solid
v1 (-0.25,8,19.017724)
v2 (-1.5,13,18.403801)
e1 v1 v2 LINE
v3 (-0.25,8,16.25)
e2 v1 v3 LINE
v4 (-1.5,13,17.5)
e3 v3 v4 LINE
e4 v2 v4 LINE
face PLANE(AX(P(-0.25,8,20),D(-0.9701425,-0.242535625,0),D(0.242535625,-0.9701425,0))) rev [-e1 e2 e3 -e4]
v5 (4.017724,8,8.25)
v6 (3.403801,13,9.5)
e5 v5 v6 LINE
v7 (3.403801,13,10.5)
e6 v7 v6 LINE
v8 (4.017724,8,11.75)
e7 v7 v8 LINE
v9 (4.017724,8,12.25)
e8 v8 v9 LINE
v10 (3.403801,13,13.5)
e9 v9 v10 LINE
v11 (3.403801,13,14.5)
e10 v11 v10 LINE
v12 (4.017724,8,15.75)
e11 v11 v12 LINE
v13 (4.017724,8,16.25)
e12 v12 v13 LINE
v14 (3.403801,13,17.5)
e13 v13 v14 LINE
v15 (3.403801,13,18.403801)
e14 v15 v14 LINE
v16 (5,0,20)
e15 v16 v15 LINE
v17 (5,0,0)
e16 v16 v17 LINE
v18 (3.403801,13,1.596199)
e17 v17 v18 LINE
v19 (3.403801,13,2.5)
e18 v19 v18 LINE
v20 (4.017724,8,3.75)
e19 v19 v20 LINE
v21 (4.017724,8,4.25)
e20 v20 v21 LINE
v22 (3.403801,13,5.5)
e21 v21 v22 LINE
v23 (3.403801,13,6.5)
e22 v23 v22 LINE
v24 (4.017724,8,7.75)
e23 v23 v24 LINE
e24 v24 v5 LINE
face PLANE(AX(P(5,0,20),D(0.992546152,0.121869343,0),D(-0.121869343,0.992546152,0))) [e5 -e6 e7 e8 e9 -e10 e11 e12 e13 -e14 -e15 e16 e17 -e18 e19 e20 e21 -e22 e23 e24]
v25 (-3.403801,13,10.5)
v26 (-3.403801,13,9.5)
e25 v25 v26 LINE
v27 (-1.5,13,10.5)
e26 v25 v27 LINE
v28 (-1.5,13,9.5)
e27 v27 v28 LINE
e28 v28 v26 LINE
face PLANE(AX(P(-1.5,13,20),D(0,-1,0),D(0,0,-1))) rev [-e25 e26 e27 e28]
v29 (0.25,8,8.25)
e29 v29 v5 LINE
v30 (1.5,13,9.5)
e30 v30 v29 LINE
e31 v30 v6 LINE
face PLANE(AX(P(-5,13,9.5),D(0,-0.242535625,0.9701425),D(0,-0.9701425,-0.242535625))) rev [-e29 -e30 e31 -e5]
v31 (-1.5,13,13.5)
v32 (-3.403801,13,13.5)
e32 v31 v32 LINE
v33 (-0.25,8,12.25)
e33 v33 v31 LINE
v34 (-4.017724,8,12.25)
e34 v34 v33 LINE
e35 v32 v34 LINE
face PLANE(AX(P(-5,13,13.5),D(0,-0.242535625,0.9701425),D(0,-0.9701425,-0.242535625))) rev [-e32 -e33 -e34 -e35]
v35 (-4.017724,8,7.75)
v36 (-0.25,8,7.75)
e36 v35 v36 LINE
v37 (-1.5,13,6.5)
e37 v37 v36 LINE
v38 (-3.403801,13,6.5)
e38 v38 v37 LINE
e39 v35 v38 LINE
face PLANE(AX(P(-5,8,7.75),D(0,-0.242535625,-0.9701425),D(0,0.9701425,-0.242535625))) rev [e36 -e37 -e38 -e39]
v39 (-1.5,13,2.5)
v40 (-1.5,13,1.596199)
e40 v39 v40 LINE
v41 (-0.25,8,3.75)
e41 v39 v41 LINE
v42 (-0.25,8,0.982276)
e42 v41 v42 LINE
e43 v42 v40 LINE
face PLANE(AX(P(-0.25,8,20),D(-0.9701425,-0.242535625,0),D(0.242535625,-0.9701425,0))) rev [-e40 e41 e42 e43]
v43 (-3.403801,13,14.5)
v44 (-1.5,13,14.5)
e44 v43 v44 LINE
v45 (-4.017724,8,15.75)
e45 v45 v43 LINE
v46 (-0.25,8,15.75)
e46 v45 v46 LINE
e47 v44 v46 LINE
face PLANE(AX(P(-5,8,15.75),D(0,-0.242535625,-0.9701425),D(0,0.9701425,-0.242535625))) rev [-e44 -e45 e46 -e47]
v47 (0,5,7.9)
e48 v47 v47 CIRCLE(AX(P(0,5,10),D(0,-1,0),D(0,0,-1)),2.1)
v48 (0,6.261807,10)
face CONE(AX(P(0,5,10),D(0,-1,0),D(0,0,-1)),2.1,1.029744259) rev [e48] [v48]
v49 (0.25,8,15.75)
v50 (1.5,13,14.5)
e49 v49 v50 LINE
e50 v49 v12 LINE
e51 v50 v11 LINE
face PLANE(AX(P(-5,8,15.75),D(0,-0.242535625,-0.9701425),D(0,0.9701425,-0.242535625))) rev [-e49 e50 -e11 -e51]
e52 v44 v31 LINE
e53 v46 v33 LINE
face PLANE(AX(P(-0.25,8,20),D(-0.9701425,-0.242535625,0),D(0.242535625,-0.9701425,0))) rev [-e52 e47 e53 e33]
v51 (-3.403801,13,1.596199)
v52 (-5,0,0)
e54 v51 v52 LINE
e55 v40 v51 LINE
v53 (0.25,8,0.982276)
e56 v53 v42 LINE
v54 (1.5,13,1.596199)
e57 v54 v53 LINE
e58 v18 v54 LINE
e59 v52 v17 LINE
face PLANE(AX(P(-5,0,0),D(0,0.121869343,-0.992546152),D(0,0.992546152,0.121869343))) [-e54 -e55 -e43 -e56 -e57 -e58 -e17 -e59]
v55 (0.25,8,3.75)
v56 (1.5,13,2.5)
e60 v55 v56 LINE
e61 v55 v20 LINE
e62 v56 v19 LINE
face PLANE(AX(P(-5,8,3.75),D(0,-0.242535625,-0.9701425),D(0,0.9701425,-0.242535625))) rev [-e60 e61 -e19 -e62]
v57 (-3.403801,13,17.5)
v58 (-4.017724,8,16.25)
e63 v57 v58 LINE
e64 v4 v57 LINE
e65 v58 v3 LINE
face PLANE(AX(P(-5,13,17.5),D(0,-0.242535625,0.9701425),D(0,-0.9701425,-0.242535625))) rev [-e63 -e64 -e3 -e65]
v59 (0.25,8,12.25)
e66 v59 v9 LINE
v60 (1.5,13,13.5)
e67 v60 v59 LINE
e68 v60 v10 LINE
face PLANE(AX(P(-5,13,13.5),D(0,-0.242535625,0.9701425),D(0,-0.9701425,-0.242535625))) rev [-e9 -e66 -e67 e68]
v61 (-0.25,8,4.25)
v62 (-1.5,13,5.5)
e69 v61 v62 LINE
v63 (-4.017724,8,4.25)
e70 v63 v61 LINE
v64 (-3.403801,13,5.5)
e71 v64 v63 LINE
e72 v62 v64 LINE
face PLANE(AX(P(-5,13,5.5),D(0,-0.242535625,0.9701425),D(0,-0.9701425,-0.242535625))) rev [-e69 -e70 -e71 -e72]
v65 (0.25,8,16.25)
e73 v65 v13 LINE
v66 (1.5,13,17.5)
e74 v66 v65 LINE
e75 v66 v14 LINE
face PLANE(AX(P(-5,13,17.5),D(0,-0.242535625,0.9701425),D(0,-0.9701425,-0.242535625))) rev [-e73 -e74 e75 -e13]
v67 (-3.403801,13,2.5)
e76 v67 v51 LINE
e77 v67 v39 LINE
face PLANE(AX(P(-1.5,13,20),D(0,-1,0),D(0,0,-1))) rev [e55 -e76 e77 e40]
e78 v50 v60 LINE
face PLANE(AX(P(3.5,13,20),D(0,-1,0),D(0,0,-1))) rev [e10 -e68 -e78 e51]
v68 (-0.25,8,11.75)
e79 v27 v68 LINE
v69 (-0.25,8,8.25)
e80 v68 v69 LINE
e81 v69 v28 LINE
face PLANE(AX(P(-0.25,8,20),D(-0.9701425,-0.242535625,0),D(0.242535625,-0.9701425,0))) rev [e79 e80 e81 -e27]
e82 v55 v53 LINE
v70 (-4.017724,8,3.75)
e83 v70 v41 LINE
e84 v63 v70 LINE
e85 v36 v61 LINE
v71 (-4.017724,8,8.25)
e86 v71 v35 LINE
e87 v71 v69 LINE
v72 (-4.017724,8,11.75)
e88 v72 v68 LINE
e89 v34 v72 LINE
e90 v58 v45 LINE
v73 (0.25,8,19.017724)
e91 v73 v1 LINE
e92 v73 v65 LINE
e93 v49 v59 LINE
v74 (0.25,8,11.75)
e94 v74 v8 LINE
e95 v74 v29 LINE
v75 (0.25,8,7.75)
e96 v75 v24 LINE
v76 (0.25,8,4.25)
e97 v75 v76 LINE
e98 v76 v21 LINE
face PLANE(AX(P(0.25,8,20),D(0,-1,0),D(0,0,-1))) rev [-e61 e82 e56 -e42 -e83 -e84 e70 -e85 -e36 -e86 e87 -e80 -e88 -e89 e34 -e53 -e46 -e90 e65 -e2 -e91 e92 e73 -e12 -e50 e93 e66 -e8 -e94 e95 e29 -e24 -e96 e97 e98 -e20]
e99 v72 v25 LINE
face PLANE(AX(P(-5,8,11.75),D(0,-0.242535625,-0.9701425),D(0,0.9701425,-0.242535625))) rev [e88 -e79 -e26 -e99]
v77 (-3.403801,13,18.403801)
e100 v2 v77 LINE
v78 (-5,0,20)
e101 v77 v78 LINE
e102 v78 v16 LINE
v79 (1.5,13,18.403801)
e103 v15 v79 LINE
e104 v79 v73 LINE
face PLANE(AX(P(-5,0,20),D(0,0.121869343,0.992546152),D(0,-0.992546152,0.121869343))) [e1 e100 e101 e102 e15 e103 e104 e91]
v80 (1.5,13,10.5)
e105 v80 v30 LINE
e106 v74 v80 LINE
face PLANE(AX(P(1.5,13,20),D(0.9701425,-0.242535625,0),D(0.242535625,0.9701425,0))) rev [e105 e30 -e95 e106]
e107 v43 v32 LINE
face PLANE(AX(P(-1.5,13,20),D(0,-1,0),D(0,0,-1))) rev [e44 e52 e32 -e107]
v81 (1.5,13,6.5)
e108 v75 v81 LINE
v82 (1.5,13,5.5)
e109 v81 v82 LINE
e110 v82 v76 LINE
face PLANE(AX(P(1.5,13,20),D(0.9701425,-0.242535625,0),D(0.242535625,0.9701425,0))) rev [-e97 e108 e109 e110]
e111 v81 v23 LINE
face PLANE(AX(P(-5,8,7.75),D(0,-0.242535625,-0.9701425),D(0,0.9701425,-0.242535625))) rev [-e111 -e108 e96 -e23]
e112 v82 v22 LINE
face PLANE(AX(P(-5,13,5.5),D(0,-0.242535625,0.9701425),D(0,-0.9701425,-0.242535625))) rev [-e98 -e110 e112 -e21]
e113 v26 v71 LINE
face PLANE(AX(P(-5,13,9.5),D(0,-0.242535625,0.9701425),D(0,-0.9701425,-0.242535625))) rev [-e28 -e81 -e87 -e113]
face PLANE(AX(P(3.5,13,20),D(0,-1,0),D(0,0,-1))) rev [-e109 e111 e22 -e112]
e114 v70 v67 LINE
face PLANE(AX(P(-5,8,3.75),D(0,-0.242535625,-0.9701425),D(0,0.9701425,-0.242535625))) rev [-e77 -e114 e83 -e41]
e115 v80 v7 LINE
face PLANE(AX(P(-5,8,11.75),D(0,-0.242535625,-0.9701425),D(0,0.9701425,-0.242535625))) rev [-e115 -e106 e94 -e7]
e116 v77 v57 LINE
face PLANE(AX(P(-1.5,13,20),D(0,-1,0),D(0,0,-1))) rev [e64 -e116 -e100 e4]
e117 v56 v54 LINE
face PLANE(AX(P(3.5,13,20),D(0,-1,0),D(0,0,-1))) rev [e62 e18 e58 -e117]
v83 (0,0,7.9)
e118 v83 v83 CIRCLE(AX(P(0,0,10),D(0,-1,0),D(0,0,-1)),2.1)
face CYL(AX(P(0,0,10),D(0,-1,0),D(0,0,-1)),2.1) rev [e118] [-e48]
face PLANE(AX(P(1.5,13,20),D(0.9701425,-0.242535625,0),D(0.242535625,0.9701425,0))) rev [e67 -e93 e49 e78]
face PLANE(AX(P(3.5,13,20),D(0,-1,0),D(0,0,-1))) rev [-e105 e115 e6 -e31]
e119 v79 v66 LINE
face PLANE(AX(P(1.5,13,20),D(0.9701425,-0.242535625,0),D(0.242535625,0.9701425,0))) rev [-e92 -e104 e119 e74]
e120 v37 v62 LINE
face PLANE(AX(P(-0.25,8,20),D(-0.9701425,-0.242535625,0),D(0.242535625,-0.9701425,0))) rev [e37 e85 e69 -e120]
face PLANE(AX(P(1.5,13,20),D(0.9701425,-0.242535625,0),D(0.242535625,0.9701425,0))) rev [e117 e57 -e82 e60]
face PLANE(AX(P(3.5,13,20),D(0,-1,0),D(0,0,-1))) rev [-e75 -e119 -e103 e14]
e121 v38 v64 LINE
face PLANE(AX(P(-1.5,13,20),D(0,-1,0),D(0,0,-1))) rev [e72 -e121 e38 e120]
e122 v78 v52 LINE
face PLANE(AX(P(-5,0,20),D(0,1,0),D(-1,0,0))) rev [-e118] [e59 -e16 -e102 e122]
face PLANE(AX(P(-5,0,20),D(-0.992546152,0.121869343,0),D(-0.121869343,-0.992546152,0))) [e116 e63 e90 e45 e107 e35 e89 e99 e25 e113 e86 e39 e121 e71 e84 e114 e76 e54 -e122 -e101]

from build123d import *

# Parameters (mm, degrees)
RESSALTO_EXTRUS_O1_DEPTH   = 20
INCLINA_O1_DEPTH           = 20
INCLINA_O1_START           = -6
INCLINA_O1_2_DEPTH         = 12
CORTE_EXTRUS_O1_DEPTH      = 25.372115214
CORTE_EXTRUS_O1_DEPTH_BACK = 25.372115214
M5_GEWINDEBOHRUNG1_D       = 4.2
M5_GEWINDEBOHRUNG1_DEPTH   = 5
M5_GEWINDEBOHRUNG1_TIP     = 1.2618073


with BuildPart() as part:
    # Esboço1 → Ressalto-extrusão1 (new body)
    with BuildSketch(Plane.XY):
        Polygon((-5, 0), (5, 0), (3.5, 13), (1.5, 13), (0.25, 8), (-0.25, 8), (-1.5, 13), (-3.5, 13), align=None)
    extrude(amount=RESSALTO_EXTRUS_O1_DEPTH)

    # Inclinação1: read off the stored shape, not the designer's step
    # Inclinação1 outline → Inclinação1 (cut)
    with BuildSketch(Plane.XY):
        Polygon((3.5, 13), (3.403800708, 13), (5, 0), align=None)
        Polygon((-5, 0), (-3.403800708, 13), (-3.5, 13), align=None)
    extrude(amount=INCLINA_O1_DEPTH, mode=Mode.SUBTRACT)

    # Inclina_o1 2 outline → Inclina_o1 2 (cut)
    with BuildSketch(Plane.YZ.offset(INCLINA_O1_START)):
        Polygon((13, 18.403800708), (13, 20), (0, 20), align=None)
        Polygon((13, 0), (13, 1.596199292), (0, 0), align=None)
    extrude(amount=INCLINA_O1_2_DEPTH, mode=Mode.SUBTRACT)

    # Esboço3 → Corte-extrusão1 (cut, two sides: drawn at the far end of the back side and taken through both)
    with BuildSketch(Plane(origin=(0, 0, 0), x_dir=(0, 0, -1), z_dir=(1, 0, 0)).offset(-CORTE_EXTRUS_O1_DEPTH_BACK)):
        Polygon((-17.5, 13), (-16.25, 8), (-15.75, 8), (-14.5, 13), align=None)
        Polygon((-13.5, 13), (-12.25, 8), (-11.75, 8), (-10.5, 13), align=None)
        Polygon((-9.5, 13), (-8.25, 8), (-7.75, 8), (-6.5, 13), align=None)
        Polygon((-5.5, 13), (-4.25, 8), (-3.75, 8), (-2.5, 13), align=None)
    extrude(amount=CORTE_EXTRUS_O1_DEPTH + CORTE_EXTRUS_O1_DEPTH_BACK, mode=Mode.SUBTRACT)

    # M5 Gewindebohrung1
    with Locations(Plane(origin=(0, 0, 10), x_dir=(-1, 0, 0), z_dir=(0, -1, 0))):
        with Locations((0, 0)):
            Hole(M5_GEWINDEBOHRUNG1_D / 2, depth=M5_GEWINDEBOHRUNG1_DEPTH)
            with Locations((0, 0, -(M5_GEWINDEBOHRUNG1_DEPTH + M5_GEWINDEBOHRUNG1_TIP / 2))):  # 118° drill point
                Cone(0, M5_GEWINDEBOHRUNG1_D / 2, M5_GEWINDEBOHRUNG1_TIP, mode=Mode.SUBTRACT)


solid = part.part
